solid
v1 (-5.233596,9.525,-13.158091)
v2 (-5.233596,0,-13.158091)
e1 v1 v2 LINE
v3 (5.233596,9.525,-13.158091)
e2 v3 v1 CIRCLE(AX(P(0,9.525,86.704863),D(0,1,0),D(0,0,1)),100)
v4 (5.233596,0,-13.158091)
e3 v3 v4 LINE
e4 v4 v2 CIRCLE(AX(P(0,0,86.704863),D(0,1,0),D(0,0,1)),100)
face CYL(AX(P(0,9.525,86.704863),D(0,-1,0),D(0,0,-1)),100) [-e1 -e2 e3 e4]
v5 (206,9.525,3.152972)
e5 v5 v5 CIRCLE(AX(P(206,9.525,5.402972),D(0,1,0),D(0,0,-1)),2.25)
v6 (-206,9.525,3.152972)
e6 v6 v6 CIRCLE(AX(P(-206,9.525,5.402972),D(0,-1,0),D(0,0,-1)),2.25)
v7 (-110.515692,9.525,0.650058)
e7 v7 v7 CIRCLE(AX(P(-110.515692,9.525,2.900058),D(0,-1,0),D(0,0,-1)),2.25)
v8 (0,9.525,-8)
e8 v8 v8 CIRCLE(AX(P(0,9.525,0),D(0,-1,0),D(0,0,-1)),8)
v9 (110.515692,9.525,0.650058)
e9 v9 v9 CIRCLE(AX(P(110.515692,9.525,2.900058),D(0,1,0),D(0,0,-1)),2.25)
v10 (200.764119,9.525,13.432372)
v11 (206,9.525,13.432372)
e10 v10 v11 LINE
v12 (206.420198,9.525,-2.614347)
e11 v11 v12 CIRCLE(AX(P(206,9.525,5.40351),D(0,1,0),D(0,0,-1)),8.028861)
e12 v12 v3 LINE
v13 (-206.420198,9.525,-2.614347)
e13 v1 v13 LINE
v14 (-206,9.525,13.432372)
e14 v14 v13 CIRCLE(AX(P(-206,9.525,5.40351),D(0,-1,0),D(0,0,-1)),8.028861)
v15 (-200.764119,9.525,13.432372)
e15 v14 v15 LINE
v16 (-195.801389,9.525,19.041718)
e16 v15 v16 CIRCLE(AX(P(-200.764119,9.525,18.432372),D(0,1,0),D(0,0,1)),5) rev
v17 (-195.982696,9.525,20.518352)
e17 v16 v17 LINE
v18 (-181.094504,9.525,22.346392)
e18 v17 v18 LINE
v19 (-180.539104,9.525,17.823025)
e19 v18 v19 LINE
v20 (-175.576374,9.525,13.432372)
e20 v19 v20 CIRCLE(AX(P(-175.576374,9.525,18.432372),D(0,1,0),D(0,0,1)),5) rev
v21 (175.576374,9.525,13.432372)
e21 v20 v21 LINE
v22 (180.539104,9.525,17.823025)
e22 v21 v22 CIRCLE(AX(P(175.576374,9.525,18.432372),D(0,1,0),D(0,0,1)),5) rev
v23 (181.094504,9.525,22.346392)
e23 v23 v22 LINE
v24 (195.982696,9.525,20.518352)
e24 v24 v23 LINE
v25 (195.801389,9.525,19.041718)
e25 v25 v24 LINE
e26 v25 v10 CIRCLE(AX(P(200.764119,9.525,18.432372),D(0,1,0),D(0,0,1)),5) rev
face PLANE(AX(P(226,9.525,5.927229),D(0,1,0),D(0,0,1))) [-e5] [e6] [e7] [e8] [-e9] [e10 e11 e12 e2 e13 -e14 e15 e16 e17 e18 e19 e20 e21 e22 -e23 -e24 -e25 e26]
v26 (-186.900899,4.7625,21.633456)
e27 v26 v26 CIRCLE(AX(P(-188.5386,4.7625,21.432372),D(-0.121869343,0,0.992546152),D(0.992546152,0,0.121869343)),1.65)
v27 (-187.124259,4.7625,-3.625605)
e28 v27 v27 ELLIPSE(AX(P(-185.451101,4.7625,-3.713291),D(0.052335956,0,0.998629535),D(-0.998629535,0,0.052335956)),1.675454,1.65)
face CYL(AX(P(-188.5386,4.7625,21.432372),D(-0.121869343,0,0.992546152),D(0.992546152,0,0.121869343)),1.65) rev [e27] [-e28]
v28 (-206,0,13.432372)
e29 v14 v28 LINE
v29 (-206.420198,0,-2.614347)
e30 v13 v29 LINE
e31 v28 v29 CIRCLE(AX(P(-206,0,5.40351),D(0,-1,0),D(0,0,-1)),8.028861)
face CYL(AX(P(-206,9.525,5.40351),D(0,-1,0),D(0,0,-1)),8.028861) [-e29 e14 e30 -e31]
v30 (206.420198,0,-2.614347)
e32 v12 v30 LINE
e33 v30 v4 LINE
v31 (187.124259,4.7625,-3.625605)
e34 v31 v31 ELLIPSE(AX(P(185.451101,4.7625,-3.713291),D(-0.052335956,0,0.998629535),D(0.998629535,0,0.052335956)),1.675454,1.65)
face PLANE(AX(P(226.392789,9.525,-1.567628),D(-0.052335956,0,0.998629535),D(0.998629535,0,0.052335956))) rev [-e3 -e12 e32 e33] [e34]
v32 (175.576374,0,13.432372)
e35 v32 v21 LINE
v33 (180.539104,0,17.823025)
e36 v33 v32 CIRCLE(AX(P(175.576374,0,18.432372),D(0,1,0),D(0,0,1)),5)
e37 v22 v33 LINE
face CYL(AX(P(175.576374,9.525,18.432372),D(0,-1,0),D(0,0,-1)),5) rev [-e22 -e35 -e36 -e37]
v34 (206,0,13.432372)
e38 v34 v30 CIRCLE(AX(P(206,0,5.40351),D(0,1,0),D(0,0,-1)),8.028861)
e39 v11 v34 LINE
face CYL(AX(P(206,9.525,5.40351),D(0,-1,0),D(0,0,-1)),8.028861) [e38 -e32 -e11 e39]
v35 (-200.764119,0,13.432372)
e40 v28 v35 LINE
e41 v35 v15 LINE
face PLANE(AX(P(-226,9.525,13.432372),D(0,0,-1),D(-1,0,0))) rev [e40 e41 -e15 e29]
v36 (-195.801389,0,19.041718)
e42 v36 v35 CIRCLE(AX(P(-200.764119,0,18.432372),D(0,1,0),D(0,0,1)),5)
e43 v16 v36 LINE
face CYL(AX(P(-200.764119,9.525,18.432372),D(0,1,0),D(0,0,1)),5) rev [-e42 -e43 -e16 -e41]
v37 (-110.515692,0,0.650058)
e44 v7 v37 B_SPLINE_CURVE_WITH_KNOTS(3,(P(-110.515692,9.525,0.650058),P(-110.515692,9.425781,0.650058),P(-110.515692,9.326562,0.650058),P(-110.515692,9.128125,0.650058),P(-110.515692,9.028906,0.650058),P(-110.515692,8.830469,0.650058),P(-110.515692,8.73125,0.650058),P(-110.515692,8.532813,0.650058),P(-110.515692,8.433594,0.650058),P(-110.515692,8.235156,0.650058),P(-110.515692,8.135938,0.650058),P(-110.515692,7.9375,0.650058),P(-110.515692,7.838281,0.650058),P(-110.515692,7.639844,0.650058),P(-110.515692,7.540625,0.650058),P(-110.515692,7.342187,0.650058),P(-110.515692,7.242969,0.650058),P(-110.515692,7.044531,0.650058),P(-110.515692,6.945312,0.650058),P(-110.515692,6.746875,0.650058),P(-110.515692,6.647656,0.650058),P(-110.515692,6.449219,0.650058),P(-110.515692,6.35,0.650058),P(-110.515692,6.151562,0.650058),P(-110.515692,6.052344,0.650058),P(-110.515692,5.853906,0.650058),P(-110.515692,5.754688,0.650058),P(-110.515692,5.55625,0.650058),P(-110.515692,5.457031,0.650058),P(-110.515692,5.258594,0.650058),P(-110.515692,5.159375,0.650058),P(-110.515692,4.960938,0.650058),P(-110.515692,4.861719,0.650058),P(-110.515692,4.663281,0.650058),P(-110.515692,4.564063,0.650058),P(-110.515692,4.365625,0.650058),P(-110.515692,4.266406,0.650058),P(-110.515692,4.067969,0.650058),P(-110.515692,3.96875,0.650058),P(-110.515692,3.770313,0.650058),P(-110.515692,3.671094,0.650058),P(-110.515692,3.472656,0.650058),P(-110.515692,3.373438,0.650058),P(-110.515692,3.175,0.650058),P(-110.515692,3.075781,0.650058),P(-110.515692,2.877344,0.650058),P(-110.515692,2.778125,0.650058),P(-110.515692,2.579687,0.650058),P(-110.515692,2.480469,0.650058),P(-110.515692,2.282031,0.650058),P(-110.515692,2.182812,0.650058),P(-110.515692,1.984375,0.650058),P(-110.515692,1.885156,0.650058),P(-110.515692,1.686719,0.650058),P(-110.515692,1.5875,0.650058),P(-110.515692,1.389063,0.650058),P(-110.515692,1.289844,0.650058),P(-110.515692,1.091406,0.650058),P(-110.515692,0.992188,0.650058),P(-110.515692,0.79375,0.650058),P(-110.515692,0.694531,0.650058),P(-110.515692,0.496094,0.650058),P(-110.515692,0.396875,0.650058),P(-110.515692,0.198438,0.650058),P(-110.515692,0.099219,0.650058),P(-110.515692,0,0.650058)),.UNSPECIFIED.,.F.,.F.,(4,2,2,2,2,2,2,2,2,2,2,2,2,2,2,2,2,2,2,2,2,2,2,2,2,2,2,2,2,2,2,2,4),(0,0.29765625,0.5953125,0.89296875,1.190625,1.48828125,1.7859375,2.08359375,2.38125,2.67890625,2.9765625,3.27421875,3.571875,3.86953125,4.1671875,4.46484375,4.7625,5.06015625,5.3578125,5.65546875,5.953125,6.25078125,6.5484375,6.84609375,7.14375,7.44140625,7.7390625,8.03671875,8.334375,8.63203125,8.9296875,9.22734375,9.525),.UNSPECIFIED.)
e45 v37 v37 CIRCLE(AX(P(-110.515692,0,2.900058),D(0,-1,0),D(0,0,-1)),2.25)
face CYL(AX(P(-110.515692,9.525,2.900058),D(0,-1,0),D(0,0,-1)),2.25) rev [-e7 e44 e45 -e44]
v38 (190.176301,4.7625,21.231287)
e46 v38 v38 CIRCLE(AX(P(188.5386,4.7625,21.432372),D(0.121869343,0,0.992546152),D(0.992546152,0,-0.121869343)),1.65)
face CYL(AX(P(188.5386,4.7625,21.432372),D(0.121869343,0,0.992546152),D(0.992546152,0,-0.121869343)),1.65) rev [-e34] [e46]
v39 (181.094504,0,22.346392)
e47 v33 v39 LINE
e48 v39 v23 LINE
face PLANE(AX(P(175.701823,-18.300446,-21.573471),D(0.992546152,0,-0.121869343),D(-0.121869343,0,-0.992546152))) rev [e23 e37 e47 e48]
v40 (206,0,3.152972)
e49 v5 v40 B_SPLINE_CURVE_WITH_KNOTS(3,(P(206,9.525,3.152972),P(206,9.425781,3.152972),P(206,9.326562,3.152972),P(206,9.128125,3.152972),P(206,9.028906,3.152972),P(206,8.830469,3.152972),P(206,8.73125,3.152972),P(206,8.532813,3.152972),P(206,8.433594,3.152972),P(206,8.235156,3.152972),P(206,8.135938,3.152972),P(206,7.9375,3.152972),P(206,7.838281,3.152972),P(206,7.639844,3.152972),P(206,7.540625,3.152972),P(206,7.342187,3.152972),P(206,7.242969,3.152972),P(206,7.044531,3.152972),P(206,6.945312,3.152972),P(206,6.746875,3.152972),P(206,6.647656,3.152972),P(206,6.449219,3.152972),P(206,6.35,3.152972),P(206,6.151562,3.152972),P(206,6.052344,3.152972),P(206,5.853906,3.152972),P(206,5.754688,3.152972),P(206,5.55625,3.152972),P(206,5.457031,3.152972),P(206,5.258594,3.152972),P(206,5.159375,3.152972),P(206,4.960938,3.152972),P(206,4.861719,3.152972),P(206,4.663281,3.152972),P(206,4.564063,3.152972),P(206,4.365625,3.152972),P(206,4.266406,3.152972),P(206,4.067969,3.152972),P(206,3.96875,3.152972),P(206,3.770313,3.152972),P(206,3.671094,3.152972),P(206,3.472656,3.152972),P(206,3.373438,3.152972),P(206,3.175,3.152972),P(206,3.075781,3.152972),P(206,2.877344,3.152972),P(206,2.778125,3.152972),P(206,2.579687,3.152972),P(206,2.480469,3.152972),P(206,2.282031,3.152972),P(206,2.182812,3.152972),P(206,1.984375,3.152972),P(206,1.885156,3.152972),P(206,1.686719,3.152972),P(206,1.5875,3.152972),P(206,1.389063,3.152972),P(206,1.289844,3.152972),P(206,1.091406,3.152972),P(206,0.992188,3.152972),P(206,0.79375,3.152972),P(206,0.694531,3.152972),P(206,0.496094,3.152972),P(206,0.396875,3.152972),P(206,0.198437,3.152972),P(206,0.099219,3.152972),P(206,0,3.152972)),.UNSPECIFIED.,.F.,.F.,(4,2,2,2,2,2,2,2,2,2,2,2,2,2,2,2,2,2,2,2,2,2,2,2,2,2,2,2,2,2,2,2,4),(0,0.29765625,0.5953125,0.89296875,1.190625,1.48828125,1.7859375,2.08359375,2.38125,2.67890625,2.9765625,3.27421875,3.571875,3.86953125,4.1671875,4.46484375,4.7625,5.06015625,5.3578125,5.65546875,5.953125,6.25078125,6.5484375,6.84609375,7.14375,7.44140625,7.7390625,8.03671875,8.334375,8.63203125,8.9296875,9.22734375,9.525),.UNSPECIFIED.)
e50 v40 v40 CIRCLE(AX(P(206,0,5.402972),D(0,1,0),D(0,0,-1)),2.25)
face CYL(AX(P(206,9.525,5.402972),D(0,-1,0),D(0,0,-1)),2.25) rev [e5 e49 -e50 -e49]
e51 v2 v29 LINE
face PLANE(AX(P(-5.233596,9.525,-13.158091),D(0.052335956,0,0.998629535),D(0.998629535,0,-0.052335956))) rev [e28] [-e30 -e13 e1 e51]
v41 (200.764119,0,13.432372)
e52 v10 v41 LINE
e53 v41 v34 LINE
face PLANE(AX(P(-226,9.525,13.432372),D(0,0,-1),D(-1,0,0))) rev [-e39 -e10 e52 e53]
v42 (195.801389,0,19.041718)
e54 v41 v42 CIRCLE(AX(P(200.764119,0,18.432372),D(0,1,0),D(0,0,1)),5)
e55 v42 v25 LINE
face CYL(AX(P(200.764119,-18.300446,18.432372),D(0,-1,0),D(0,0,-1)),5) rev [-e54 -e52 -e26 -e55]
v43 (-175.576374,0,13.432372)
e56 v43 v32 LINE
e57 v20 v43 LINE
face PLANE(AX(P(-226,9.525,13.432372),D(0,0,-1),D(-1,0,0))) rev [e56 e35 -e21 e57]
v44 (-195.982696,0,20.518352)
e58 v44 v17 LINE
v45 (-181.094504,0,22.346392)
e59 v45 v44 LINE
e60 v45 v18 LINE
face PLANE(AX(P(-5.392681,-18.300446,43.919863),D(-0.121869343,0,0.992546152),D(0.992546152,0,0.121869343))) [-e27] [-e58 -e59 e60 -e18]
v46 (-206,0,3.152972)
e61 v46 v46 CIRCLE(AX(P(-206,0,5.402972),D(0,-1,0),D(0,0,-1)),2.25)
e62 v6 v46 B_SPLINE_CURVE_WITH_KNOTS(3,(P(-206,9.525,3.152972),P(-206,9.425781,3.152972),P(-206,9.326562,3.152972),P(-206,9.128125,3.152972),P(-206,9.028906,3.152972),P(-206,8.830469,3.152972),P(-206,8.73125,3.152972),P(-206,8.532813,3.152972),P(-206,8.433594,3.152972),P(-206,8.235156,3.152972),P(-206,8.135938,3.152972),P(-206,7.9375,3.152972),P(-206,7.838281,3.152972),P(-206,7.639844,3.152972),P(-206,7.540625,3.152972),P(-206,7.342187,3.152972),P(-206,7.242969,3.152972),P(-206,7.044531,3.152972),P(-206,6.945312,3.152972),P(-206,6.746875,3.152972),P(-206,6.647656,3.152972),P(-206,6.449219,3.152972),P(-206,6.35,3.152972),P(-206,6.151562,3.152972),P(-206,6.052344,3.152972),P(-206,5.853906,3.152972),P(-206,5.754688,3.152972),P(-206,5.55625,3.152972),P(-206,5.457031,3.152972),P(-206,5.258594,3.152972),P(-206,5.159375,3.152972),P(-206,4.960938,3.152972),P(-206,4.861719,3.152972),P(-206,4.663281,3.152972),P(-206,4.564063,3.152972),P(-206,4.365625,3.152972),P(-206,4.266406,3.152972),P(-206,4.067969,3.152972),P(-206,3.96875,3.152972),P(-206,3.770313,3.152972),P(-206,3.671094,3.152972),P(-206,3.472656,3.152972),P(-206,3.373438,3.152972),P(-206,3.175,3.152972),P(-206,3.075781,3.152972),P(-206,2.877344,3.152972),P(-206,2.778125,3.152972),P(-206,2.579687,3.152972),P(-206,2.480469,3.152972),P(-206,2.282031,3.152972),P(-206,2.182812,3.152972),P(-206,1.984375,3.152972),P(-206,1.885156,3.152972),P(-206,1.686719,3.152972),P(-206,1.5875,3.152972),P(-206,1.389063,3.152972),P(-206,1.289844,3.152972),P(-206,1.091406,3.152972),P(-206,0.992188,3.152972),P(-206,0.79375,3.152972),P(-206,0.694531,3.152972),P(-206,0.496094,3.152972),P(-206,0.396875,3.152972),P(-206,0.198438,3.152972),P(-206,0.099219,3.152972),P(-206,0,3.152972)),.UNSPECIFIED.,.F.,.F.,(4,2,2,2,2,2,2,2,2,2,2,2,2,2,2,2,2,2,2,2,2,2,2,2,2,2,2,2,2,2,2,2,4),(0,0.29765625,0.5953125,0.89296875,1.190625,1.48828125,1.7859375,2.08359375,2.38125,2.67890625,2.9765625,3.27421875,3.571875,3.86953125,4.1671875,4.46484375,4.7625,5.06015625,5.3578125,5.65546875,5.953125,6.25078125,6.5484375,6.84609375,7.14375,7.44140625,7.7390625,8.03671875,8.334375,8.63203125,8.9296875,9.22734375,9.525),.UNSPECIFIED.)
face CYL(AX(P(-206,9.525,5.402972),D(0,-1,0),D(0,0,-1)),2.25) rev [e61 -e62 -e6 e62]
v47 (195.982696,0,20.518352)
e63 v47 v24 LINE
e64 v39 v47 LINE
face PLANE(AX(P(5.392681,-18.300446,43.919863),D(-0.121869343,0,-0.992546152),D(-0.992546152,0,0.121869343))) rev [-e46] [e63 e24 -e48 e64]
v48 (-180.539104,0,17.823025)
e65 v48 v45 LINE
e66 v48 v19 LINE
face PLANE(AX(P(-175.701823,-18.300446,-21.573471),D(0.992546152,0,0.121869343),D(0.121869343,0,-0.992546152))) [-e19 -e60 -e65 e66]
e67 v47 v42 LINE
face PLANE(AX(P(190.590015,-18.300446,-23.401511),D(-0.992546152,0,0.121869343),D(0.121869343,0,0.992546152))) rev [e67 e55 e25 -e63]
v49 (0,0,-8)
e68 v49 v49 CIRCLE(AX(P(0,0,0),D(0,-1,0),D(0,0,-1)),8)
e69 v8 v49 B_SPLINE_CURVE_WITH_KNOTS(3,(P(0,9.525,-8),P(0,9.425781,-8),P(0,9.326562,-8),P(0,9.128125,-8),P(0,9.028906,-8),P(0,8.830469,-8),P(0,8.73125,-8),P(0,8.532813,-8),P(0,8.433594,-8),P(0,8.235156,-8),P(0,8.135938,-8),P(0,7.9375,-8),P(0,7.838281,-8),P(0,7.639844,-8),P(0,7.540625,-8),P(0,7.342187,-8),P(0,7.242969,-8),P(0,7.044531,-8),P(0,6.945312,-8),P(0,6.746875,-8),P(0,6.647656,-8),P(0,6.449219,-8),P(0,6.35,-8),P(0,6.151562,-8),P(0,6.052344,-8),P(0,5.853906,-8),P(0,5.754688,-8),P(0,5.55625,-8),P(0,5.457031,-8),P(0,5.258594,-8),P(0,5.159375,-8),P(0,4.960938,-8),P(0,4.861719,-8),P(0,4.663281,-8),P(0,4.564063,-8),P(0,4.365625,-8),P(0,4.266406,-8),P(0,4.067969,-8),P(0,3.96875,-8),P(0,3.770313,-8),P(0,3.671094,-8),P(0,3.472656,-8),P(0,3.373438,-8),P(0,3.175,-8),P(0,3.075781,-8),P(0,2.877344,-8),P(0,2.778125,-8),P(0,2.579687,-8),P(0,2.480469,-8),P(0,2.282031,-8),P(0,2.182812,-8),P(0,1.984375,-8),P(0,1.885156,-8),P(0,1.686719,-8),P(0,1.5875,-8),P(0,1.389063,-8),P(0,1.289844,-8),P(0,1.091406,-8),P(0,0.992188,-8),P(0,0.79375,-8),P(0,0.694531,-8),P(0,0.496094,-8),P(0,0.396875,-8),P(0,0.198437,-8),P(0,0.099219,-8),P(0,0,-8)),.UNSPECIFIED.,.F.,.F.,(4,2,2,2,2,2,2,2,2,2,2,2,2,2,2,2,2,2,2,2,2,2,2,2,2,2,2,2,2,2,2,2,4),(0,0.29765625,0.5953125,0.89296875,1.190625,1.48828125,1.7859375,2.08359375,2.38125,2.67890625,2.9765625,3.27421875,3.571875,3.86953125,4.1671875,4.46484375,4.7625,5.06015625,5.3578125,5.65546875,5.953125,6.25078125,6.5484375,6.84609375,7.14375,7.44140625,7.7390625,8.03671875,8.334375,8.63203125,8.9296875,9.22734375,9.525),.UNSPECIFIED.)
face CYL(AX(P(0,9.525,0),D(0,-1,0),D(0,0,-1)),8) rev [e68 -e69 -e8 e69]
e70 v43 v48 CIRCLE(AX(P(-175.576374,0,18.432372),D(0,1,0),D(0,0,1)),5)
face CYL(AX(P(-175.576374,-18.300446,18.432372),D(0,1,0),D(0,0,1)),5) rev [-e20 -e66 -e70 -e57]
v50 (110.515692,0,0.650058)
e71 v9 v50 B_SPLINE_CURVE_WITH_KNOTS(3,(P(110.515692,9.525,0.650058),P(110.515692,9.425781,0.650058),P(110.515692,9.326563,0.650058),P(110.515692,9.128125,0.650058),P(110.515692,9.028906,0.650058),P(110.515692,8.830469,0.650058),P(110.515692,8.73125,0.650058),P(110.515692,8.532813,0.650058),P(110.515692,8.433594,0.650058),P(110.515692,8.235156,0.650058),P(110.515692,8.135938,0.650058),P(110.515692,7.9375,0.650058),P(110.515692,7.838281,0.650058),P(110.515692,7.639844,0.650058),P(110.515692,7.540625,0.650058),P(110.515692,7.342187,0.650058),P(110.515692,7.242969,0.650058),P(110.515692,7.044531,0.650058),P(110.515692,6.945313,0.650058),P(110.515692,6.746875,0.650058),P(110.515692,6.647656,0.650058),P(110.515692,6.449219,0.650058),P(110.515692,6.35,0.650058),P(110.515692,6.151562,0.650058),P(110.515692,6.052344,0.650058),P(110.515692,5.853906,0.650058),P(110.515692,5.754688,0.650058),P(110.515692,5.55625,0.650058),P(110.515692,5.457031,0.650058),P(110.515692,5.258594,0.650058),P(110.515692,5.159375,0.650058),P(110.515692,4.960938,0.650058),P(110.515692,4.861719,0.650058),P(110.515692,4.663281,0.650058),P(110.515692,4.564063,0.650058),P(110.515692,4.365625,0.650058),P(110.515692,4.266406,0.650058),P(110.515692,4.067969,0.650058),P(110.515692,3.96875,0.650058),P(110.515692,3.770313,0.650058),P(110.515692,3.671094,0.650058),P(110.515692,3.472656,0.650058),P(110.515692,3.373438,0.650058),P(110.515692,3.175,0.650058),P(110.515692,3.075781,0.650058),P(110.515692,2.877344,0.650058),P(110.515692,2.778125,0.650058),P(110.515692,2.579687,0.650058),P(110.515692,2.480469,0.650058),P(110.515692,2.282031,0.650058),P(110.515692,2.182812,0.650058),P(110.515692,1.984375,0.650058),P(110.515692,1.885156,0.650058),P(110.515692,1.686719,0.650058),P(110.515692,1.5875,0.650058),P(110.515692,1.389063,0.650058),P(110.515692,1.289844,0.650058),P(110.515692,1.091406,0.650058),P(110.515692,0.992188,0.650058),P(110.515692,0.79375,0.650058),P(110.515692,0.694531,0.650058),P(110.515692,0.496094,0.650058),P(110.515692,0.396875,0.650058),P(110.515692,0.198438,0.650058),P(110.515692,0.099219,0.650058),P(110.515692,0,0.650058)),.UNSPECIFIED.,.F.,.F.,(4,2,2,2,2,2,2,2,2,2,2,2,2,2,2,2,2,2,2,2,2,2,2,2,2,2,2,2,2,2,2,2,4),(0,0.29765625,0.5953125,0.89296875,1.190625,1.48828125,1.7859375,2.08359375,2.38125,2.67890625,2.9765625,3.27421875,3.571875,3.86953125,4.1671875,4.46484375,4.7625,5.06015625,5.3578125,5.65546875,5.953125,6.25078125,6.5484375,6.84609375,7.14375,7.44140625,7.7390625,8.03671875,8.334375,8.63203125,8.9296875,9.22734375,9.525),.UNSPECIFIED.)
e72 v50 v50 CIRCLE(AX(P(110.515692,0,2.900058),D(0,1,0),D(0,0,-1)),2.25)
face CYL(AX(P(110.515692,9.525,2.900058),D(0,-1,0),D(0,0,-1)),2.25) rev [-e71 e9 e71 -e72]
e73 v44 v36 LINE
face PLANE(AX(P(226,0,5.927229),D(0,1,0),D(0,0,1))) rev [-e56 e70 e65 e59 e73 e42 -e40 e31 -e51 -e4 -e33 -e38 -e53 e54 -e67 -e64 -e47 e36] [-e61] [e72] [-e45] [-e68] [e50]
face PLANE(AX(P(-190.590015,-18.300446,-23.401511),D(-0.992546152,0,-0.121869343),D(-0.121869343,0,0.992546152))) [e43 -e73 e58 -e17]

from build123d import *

# Parameters (mm, degrees)
STOCK_UOR22_CNS_5_P_007_SWING_ARM_PLATE_START = -3.175
STOCK_UOR22_CNS_5_P_007_SWING_ARM_PL_2_R      = 2.9
STOCK_UOR22_CNS_5_P_007_SWING_ARM_PL_2_R_2    = 2.25
STOCK_UOR22_CNS_5_P_007_SWING_ARM_PL_2_R_3    = 8
STOCK_UOR22_CNS_5_P_007_SWING_ARM_PLATE_DEPTH = 3.175
BOSS_EXTRUDE2_DEPTH                           = 9.525
SKETCH5_R                                     = 8
CUT_EXTRUDE1_DEPTH                            = 235.085039959
SKETCH7_R                                     = 2.25
CUT_EXTRUDE3_DEPTH                            = 235.085039959
CUT_EXTRUDE2_DEPTH                            = 235.085039959
BOSS_EXTRUDE5_DEPTH                           = 9.525
M4_TAPPED_HOLE1_D                             = 3.3
FILLET4_R                                     = 5
FILLET4_OF_MIRROR7_R                          = 5


# Read off the part's stored shape, not the designer's step: Stock-UOR22-CNS-5-P-007_Swing_arm_plate-1
with BuildPart() as part:
    # Stock-UOR22-CNS-5-P-007_Swing_arm_pl 2 → Stock-UOR22-CNS-5-P-007_Swing_arm_plate-1 (new body)
    with BuildSketch(Plane(origin=(0, 0, 0), x_dir=(1, 0, 0), z_dir=(0, 1, 0)).offset(STOCK_UOR22_CNS_5_P_007_SWING_ARM_PLATE_START)):
        with BuildLine():
            ThreePointArc((226, -13.432371654), (233.502570944, -6.12369062), (226.392788824, 1.567628346))
            Line((226.392788824, 1.567628346), (5.233595624, 13.15809053))
            ThreePointArc((5.233595624, 13.15809053), (0, 13.295137054), (-5.233595624, 13.15809053))
            Line((-5.233595624, 13.15809053), (-226.392788824, 1.567628346))
            ThreePointArc((-226.392788824, 1.567628346), (-233.502570944, -6.12369062), (-226, -13.432371654))
            Line((-226, -13.432371654), (226, -13.432371654))
        make_face()
        with Locations((-226, -5.927228885)):
            Circle(STOCK_UOR22_CNS_5_P_007_SWING_ARM_PL_2_R, mode=Mode.SUBTRACT)
        with Locations((-206, -5.40297223)):
            Circle(STOCK_UOR22_CNS_5_P_007_SWING_ARM_PL_2_R_2, mode=Mode.SUBTRACT)
        with BuildLine():
            ThreePointArc((-200.009372106, -5.067744788), (-199.5011525, -3.620374273), (-198.117168054, -2.958743238))
            Line((-198.117168054, -2.958743238), (-118.332872644, 1.222574507))
            ThreePointArc((-118.332872644, 1.222574507), (-116.669449692, 0.478429636), (-116.300073603, -1.306027932))
            ThreePointArc((-116.300073603, -1.306027932), (-116.513571396, -3.059574073), (-116.207168794, -4.799293251))
            ThreePointArc((-116.207168794, -4.799293251), (-116.481651343, -6.601525877), (-118.104327652, -7.432371654))
            Line((-118.104327652, -7.432371654), (-198.000054021, -7.432371654))
            ThreePointArc((-198.000054021, -7.432371654), (-199.416863766, -6.843984258), (-200.000040515, -5.425021798))
            ThreePointArc((-200.000040515, -5.425021798), (-200.002045504, -5.246313796), (-200.009372106, -5.067744788))
        make_face(mode=Mode.SUBTRACT)
        with Locations((-110.515692218, -2.900058041)):
            Circle(STOCK_UOR22_CNS_5_P_007_SWING_ARM_PL_2_R_2, mode=Mode.SUBTRACT)
        with BuildLine():
            ThreePointArc((-15.423577727, 6.615822121), (-13.745275303, 5.852940228), (-13.404042587, 4.04124267))
            ThreePointArc((-13.404042587, 4.04124267), (-13.994975846, -0.375034774), (-13.168367384, -4.753325197))
            ThreePointArc((-13.168367384, -4.753325197), (-13.412783431, -6.581699085), (-15.049562725, -7.432371654))
            Line((-15.049562725, -7.432371654), (-102.927056783, -7.432371654))
            ThreePointArc((-102.927056783, -7.432371654), (-104.549733092, -6.601525877), (-104.824215641, -4.799293251))
            ThreePointArc((-104.824215641, -4.799293251), (-104.5176845, -2.745450719), (-104.929619796, -0.710127699))
            ThreePointArc((-104.929619796, -0.710127699), (-104.748793796, 1.103164739), (-103.172267568, 2.017108151))
            Line((-103.172267568, 2.017108151), (-15.423577727, 6.615822121))
        make_face(mode=Mode.SUBTRACT)
        with Locations((110.515692218, -2.900058041)):
            Circle(STOCK_UOR22_CNS_5_P_007_SWING_ARM_PL_2_R_2, mode=Mode.SUBTRACT)
        with BuildLine():
            Line((15.423577727, 6.615822121), (103.172267568, 2.017108151))
            ThreePointArc((103.172267568, 2.017108151), (104.748793796, 1.103164739), (104.929619796, -0.710127699))
            ThreePointArc((104.929619796, -0.710127699), (104.5176845, -2.745450719), (104.824215641, -4.799293251))
            ThreePointArc((104.824215641, -4.799293251), (104.549733092, -6.601525877), (102.927056783, -7.432371654))
            Line((102.927056783, -7.432371654), (15.049562725, -7.432371654))
            ThreePointArc((15.049562725, -7.432371654), (13.412783431, -6.581699085), (13.168367384, -4.753325197))
            ThreePointArc((13.168367384, -4.753325197), (13.994975846, -0.375034774), (13.404042587, 4.04124267))
            ThreePointArc((13.404042587, 4.04124267), (13.745275303, 5.852940228), (15.423577727, 6.615822121))
        make_face(mode=Mode.SUBTRACT)
        with Locations((226, -5.927228885)):
            Circle(STOCK_UOR22_CNS_5_P_007_SWING_ARM_PL_2_R, mode=Mode.SUBTRACT)
        with Locations((206, -5.40297223)):
            Circle(STOCK_UOR22_CNS_5_P_007_SWING_ARM_PL_2_R_2, mode=Mode.SUBTRACT)
        with BuildLine():
            Line((118.332872644, 1.222574507), (198.117168054, -2.958743238))
            ThreePointArc((198.117168054, -2.958743238), (199.5011525, -3.620374273), (200.009372106, -5.067744788))
            ThreePointArc((200.009372106, -5.067744788), (200.002045504, -5.246313796), (200.000040515, -5.425021798))
            ThreePointArc((200.000040515, -5.425021798), (199.416863766, -6.843984258), (198.000054021, -7.432371654))
            Line((198.000054021, -7.432371654), (118.104327652, -7.432371654))
            ThreePointArc((118.104327652, -7.432371654), (116.481651343, -6.601525877), (116.207168794, -4.799293251))
            ThreePointArc((116.207168794, -4.799293251), (116.513571396, -3.059574073), (116.300073603, -1.306027932))
            ThreePointArc((116.300073603, -1.306027932), (116.669449692, 0.478429636), (118.332872644, 1.222574507))
        make_face(mode=Mode.SUBTRACT)
        Circle(STOCK_UOR22_CNS_5_P_007_SWING_ARM_PL_2_R_3, mode=Mode.SUBTRACT)
    extrude(amount=STOCK_UOR22_CNS_5_P_007_SWING_ARM_PLATE_DEPTH)


with BuildPart() as body_2:
    # Sketch3 → Boss-Extrude2 (new body)
    with BuildSketch(Plane(origin=(0, 0, 0), x_dir=(1, 0, 0), z_dir=(0, 1, 0))):
        with BuildLine():
            Line((226.392788824, 1.567628346), (5.233595624, 13.15809053))
            ThreePointArc((5.233595624, 13.15809053), (0, 13.295137054), (-5.233595624, 13.15809053))
            Line((-5.233595624, 13.15809053), (-226.392788824, 1.567628346))
            ThreePointArc((-226.392788824, 1.567628346), (-233.502570944, -6.12369062), (-226, -13.432371654))
            Line((-226, -13.432371654), (226, -13.432371654))
            ThreePointArc((226, -13.432371654), (233.502570944, -6.12369062), (226.392788824, 1.567628346))
        make_face()
    extrude(amount=BOSS_EXTRUDE2_DEPTH)

    # Sketch5 → Cut-Extrude1 (cut, through all)
    with BuildSketch(Plane.XZ):
        with Locations(Location((0, 0, 0), (0, 0, 270))):
            Circle(SKETCH5_R)
    extrude(amount=-CUT_EXTRUDE1_DEPTH, mode=Mode.SUBTRACT)

    # Sketch7 → Cut-Extrude3 (cut, through all)
    with BuildSketch(Plane.XZ):
        with Locations(Location((-206, 5.40297223, 0), (0, 0, 270))):
            Circle(SKETCH7_R)
        with Locations(Location((-110.515692218, 2.900058041, 0), (0, 0, 270))):
            Circle(SKETCH7_R)
    cut_extrude3 = extrude(amount=-CUT_EXTRUDE3_DEPTH, mode=Mode.SUBTRACT)

    # Sketch6 → Cut-Extrude2 (cut, through all)
    with BuildSketch(Plane.XZ):
        with BuildLine():
            Line((-226.392788824, -1.567628346), (-206.420198128, -2.614347471))
            ThreePointArc((-206.420198128, -2.614347471), (-214.02610991, 5.613681539), (-206, 13.432371654))
            Line((-206, 13.432371654), (-226, 13.432371654))
            ThreePointArc((-226, 13.432371654), (-233.502570944, 6.12369062), (-226.392788824, -1.567628346))
        make_face()
    cut_extrude2 = extrude(amount=-CUT_EXTRUDE2_DEPTH, mode=Mode.SUBTRACT)

    # Mirror4: Cut-Extrude3, Cut-Extrude2 across plane
    add(cut_extrude3.mirror(Plane(origin=(0, 0, 0), x_dir=(0, 0, 1), z_dir=(1, 0, 0))), mode=Mode.SUBTRACT)
    add(cut_extrude2.mirror(Plane(origin=(0, 0, 0), x_dir=(0, 0, 1), z_dir=(1, 0, 0))), mode=Mode.SUBTRACT)

    # Sketch8 → Boss-Extrude5 (add)
    with BuildSketch(Plane(origin=(0, 9.525, 0), x_dir=(1, 0, 0), z_dir=(0, 1, 0))):
        Polygon((-180, -13.432371654), (-195.112647382, -13.432371654), (-195.982696315, -20.518351578), (-181.094504041, -22.34639173), align=None)
    boss_extrude5 = extrude(amount=-BOSS_EXTRUDE5_DEPTH)

    # M4 Tapped Hole1 (through all)
    with Locations(Plane(origin=(-5.392681082, 0, 43.919862911), x_dir=(0.992546151641322, 0, 0.12186934340514761), z_dir=(-0.12186934340514761, 0, 0.992546151641322))):
        with Locations((-184.521312982, 4.7625)):
            m4_tapped_hole1 = Hole(M4_TAPPED_HOLE1_D / 2)

    # Fillet4
    fillet4_edges = [body_2.edges().sort_by_distance(p)[0] for p in [
        (-195.112647382, 4.7625, 13.432371654),
        (-180, 4.7625, 13.432371654),
    ]]
    fillet(fillet4_edges, radius=FILLET4_R)

    # Mirror7: Boss-Extrude5, M4 Tapped Hole1 across plane
    add(boss_extrude5.mirror(Plane(origin=(0, 0, 0), x_dir=(0, 0, 1), z_dir=(1, 0, 0))))
    add(m4_tapped_hole1.mirror(Plane(origin=(0, 0, 0), x_dir=(0, 0, 1), z_dir=(1, 0, 0))), mode=Mode.SUBTRACT)

    # Fillet4 of Mirror7
    fillet4_of_mirror7_edges = [body_2.edges().sort_by_distance(p)[0] for p in [
        (195.112647382, 4.7625, 13.432371654),
        (180, 4.7625, 13.432371654),
    ]]
    fillet(fillet4_of_mirror7_edges, radius=FILLET4_OF_MIRROR7_R)


solid = body_2.part
